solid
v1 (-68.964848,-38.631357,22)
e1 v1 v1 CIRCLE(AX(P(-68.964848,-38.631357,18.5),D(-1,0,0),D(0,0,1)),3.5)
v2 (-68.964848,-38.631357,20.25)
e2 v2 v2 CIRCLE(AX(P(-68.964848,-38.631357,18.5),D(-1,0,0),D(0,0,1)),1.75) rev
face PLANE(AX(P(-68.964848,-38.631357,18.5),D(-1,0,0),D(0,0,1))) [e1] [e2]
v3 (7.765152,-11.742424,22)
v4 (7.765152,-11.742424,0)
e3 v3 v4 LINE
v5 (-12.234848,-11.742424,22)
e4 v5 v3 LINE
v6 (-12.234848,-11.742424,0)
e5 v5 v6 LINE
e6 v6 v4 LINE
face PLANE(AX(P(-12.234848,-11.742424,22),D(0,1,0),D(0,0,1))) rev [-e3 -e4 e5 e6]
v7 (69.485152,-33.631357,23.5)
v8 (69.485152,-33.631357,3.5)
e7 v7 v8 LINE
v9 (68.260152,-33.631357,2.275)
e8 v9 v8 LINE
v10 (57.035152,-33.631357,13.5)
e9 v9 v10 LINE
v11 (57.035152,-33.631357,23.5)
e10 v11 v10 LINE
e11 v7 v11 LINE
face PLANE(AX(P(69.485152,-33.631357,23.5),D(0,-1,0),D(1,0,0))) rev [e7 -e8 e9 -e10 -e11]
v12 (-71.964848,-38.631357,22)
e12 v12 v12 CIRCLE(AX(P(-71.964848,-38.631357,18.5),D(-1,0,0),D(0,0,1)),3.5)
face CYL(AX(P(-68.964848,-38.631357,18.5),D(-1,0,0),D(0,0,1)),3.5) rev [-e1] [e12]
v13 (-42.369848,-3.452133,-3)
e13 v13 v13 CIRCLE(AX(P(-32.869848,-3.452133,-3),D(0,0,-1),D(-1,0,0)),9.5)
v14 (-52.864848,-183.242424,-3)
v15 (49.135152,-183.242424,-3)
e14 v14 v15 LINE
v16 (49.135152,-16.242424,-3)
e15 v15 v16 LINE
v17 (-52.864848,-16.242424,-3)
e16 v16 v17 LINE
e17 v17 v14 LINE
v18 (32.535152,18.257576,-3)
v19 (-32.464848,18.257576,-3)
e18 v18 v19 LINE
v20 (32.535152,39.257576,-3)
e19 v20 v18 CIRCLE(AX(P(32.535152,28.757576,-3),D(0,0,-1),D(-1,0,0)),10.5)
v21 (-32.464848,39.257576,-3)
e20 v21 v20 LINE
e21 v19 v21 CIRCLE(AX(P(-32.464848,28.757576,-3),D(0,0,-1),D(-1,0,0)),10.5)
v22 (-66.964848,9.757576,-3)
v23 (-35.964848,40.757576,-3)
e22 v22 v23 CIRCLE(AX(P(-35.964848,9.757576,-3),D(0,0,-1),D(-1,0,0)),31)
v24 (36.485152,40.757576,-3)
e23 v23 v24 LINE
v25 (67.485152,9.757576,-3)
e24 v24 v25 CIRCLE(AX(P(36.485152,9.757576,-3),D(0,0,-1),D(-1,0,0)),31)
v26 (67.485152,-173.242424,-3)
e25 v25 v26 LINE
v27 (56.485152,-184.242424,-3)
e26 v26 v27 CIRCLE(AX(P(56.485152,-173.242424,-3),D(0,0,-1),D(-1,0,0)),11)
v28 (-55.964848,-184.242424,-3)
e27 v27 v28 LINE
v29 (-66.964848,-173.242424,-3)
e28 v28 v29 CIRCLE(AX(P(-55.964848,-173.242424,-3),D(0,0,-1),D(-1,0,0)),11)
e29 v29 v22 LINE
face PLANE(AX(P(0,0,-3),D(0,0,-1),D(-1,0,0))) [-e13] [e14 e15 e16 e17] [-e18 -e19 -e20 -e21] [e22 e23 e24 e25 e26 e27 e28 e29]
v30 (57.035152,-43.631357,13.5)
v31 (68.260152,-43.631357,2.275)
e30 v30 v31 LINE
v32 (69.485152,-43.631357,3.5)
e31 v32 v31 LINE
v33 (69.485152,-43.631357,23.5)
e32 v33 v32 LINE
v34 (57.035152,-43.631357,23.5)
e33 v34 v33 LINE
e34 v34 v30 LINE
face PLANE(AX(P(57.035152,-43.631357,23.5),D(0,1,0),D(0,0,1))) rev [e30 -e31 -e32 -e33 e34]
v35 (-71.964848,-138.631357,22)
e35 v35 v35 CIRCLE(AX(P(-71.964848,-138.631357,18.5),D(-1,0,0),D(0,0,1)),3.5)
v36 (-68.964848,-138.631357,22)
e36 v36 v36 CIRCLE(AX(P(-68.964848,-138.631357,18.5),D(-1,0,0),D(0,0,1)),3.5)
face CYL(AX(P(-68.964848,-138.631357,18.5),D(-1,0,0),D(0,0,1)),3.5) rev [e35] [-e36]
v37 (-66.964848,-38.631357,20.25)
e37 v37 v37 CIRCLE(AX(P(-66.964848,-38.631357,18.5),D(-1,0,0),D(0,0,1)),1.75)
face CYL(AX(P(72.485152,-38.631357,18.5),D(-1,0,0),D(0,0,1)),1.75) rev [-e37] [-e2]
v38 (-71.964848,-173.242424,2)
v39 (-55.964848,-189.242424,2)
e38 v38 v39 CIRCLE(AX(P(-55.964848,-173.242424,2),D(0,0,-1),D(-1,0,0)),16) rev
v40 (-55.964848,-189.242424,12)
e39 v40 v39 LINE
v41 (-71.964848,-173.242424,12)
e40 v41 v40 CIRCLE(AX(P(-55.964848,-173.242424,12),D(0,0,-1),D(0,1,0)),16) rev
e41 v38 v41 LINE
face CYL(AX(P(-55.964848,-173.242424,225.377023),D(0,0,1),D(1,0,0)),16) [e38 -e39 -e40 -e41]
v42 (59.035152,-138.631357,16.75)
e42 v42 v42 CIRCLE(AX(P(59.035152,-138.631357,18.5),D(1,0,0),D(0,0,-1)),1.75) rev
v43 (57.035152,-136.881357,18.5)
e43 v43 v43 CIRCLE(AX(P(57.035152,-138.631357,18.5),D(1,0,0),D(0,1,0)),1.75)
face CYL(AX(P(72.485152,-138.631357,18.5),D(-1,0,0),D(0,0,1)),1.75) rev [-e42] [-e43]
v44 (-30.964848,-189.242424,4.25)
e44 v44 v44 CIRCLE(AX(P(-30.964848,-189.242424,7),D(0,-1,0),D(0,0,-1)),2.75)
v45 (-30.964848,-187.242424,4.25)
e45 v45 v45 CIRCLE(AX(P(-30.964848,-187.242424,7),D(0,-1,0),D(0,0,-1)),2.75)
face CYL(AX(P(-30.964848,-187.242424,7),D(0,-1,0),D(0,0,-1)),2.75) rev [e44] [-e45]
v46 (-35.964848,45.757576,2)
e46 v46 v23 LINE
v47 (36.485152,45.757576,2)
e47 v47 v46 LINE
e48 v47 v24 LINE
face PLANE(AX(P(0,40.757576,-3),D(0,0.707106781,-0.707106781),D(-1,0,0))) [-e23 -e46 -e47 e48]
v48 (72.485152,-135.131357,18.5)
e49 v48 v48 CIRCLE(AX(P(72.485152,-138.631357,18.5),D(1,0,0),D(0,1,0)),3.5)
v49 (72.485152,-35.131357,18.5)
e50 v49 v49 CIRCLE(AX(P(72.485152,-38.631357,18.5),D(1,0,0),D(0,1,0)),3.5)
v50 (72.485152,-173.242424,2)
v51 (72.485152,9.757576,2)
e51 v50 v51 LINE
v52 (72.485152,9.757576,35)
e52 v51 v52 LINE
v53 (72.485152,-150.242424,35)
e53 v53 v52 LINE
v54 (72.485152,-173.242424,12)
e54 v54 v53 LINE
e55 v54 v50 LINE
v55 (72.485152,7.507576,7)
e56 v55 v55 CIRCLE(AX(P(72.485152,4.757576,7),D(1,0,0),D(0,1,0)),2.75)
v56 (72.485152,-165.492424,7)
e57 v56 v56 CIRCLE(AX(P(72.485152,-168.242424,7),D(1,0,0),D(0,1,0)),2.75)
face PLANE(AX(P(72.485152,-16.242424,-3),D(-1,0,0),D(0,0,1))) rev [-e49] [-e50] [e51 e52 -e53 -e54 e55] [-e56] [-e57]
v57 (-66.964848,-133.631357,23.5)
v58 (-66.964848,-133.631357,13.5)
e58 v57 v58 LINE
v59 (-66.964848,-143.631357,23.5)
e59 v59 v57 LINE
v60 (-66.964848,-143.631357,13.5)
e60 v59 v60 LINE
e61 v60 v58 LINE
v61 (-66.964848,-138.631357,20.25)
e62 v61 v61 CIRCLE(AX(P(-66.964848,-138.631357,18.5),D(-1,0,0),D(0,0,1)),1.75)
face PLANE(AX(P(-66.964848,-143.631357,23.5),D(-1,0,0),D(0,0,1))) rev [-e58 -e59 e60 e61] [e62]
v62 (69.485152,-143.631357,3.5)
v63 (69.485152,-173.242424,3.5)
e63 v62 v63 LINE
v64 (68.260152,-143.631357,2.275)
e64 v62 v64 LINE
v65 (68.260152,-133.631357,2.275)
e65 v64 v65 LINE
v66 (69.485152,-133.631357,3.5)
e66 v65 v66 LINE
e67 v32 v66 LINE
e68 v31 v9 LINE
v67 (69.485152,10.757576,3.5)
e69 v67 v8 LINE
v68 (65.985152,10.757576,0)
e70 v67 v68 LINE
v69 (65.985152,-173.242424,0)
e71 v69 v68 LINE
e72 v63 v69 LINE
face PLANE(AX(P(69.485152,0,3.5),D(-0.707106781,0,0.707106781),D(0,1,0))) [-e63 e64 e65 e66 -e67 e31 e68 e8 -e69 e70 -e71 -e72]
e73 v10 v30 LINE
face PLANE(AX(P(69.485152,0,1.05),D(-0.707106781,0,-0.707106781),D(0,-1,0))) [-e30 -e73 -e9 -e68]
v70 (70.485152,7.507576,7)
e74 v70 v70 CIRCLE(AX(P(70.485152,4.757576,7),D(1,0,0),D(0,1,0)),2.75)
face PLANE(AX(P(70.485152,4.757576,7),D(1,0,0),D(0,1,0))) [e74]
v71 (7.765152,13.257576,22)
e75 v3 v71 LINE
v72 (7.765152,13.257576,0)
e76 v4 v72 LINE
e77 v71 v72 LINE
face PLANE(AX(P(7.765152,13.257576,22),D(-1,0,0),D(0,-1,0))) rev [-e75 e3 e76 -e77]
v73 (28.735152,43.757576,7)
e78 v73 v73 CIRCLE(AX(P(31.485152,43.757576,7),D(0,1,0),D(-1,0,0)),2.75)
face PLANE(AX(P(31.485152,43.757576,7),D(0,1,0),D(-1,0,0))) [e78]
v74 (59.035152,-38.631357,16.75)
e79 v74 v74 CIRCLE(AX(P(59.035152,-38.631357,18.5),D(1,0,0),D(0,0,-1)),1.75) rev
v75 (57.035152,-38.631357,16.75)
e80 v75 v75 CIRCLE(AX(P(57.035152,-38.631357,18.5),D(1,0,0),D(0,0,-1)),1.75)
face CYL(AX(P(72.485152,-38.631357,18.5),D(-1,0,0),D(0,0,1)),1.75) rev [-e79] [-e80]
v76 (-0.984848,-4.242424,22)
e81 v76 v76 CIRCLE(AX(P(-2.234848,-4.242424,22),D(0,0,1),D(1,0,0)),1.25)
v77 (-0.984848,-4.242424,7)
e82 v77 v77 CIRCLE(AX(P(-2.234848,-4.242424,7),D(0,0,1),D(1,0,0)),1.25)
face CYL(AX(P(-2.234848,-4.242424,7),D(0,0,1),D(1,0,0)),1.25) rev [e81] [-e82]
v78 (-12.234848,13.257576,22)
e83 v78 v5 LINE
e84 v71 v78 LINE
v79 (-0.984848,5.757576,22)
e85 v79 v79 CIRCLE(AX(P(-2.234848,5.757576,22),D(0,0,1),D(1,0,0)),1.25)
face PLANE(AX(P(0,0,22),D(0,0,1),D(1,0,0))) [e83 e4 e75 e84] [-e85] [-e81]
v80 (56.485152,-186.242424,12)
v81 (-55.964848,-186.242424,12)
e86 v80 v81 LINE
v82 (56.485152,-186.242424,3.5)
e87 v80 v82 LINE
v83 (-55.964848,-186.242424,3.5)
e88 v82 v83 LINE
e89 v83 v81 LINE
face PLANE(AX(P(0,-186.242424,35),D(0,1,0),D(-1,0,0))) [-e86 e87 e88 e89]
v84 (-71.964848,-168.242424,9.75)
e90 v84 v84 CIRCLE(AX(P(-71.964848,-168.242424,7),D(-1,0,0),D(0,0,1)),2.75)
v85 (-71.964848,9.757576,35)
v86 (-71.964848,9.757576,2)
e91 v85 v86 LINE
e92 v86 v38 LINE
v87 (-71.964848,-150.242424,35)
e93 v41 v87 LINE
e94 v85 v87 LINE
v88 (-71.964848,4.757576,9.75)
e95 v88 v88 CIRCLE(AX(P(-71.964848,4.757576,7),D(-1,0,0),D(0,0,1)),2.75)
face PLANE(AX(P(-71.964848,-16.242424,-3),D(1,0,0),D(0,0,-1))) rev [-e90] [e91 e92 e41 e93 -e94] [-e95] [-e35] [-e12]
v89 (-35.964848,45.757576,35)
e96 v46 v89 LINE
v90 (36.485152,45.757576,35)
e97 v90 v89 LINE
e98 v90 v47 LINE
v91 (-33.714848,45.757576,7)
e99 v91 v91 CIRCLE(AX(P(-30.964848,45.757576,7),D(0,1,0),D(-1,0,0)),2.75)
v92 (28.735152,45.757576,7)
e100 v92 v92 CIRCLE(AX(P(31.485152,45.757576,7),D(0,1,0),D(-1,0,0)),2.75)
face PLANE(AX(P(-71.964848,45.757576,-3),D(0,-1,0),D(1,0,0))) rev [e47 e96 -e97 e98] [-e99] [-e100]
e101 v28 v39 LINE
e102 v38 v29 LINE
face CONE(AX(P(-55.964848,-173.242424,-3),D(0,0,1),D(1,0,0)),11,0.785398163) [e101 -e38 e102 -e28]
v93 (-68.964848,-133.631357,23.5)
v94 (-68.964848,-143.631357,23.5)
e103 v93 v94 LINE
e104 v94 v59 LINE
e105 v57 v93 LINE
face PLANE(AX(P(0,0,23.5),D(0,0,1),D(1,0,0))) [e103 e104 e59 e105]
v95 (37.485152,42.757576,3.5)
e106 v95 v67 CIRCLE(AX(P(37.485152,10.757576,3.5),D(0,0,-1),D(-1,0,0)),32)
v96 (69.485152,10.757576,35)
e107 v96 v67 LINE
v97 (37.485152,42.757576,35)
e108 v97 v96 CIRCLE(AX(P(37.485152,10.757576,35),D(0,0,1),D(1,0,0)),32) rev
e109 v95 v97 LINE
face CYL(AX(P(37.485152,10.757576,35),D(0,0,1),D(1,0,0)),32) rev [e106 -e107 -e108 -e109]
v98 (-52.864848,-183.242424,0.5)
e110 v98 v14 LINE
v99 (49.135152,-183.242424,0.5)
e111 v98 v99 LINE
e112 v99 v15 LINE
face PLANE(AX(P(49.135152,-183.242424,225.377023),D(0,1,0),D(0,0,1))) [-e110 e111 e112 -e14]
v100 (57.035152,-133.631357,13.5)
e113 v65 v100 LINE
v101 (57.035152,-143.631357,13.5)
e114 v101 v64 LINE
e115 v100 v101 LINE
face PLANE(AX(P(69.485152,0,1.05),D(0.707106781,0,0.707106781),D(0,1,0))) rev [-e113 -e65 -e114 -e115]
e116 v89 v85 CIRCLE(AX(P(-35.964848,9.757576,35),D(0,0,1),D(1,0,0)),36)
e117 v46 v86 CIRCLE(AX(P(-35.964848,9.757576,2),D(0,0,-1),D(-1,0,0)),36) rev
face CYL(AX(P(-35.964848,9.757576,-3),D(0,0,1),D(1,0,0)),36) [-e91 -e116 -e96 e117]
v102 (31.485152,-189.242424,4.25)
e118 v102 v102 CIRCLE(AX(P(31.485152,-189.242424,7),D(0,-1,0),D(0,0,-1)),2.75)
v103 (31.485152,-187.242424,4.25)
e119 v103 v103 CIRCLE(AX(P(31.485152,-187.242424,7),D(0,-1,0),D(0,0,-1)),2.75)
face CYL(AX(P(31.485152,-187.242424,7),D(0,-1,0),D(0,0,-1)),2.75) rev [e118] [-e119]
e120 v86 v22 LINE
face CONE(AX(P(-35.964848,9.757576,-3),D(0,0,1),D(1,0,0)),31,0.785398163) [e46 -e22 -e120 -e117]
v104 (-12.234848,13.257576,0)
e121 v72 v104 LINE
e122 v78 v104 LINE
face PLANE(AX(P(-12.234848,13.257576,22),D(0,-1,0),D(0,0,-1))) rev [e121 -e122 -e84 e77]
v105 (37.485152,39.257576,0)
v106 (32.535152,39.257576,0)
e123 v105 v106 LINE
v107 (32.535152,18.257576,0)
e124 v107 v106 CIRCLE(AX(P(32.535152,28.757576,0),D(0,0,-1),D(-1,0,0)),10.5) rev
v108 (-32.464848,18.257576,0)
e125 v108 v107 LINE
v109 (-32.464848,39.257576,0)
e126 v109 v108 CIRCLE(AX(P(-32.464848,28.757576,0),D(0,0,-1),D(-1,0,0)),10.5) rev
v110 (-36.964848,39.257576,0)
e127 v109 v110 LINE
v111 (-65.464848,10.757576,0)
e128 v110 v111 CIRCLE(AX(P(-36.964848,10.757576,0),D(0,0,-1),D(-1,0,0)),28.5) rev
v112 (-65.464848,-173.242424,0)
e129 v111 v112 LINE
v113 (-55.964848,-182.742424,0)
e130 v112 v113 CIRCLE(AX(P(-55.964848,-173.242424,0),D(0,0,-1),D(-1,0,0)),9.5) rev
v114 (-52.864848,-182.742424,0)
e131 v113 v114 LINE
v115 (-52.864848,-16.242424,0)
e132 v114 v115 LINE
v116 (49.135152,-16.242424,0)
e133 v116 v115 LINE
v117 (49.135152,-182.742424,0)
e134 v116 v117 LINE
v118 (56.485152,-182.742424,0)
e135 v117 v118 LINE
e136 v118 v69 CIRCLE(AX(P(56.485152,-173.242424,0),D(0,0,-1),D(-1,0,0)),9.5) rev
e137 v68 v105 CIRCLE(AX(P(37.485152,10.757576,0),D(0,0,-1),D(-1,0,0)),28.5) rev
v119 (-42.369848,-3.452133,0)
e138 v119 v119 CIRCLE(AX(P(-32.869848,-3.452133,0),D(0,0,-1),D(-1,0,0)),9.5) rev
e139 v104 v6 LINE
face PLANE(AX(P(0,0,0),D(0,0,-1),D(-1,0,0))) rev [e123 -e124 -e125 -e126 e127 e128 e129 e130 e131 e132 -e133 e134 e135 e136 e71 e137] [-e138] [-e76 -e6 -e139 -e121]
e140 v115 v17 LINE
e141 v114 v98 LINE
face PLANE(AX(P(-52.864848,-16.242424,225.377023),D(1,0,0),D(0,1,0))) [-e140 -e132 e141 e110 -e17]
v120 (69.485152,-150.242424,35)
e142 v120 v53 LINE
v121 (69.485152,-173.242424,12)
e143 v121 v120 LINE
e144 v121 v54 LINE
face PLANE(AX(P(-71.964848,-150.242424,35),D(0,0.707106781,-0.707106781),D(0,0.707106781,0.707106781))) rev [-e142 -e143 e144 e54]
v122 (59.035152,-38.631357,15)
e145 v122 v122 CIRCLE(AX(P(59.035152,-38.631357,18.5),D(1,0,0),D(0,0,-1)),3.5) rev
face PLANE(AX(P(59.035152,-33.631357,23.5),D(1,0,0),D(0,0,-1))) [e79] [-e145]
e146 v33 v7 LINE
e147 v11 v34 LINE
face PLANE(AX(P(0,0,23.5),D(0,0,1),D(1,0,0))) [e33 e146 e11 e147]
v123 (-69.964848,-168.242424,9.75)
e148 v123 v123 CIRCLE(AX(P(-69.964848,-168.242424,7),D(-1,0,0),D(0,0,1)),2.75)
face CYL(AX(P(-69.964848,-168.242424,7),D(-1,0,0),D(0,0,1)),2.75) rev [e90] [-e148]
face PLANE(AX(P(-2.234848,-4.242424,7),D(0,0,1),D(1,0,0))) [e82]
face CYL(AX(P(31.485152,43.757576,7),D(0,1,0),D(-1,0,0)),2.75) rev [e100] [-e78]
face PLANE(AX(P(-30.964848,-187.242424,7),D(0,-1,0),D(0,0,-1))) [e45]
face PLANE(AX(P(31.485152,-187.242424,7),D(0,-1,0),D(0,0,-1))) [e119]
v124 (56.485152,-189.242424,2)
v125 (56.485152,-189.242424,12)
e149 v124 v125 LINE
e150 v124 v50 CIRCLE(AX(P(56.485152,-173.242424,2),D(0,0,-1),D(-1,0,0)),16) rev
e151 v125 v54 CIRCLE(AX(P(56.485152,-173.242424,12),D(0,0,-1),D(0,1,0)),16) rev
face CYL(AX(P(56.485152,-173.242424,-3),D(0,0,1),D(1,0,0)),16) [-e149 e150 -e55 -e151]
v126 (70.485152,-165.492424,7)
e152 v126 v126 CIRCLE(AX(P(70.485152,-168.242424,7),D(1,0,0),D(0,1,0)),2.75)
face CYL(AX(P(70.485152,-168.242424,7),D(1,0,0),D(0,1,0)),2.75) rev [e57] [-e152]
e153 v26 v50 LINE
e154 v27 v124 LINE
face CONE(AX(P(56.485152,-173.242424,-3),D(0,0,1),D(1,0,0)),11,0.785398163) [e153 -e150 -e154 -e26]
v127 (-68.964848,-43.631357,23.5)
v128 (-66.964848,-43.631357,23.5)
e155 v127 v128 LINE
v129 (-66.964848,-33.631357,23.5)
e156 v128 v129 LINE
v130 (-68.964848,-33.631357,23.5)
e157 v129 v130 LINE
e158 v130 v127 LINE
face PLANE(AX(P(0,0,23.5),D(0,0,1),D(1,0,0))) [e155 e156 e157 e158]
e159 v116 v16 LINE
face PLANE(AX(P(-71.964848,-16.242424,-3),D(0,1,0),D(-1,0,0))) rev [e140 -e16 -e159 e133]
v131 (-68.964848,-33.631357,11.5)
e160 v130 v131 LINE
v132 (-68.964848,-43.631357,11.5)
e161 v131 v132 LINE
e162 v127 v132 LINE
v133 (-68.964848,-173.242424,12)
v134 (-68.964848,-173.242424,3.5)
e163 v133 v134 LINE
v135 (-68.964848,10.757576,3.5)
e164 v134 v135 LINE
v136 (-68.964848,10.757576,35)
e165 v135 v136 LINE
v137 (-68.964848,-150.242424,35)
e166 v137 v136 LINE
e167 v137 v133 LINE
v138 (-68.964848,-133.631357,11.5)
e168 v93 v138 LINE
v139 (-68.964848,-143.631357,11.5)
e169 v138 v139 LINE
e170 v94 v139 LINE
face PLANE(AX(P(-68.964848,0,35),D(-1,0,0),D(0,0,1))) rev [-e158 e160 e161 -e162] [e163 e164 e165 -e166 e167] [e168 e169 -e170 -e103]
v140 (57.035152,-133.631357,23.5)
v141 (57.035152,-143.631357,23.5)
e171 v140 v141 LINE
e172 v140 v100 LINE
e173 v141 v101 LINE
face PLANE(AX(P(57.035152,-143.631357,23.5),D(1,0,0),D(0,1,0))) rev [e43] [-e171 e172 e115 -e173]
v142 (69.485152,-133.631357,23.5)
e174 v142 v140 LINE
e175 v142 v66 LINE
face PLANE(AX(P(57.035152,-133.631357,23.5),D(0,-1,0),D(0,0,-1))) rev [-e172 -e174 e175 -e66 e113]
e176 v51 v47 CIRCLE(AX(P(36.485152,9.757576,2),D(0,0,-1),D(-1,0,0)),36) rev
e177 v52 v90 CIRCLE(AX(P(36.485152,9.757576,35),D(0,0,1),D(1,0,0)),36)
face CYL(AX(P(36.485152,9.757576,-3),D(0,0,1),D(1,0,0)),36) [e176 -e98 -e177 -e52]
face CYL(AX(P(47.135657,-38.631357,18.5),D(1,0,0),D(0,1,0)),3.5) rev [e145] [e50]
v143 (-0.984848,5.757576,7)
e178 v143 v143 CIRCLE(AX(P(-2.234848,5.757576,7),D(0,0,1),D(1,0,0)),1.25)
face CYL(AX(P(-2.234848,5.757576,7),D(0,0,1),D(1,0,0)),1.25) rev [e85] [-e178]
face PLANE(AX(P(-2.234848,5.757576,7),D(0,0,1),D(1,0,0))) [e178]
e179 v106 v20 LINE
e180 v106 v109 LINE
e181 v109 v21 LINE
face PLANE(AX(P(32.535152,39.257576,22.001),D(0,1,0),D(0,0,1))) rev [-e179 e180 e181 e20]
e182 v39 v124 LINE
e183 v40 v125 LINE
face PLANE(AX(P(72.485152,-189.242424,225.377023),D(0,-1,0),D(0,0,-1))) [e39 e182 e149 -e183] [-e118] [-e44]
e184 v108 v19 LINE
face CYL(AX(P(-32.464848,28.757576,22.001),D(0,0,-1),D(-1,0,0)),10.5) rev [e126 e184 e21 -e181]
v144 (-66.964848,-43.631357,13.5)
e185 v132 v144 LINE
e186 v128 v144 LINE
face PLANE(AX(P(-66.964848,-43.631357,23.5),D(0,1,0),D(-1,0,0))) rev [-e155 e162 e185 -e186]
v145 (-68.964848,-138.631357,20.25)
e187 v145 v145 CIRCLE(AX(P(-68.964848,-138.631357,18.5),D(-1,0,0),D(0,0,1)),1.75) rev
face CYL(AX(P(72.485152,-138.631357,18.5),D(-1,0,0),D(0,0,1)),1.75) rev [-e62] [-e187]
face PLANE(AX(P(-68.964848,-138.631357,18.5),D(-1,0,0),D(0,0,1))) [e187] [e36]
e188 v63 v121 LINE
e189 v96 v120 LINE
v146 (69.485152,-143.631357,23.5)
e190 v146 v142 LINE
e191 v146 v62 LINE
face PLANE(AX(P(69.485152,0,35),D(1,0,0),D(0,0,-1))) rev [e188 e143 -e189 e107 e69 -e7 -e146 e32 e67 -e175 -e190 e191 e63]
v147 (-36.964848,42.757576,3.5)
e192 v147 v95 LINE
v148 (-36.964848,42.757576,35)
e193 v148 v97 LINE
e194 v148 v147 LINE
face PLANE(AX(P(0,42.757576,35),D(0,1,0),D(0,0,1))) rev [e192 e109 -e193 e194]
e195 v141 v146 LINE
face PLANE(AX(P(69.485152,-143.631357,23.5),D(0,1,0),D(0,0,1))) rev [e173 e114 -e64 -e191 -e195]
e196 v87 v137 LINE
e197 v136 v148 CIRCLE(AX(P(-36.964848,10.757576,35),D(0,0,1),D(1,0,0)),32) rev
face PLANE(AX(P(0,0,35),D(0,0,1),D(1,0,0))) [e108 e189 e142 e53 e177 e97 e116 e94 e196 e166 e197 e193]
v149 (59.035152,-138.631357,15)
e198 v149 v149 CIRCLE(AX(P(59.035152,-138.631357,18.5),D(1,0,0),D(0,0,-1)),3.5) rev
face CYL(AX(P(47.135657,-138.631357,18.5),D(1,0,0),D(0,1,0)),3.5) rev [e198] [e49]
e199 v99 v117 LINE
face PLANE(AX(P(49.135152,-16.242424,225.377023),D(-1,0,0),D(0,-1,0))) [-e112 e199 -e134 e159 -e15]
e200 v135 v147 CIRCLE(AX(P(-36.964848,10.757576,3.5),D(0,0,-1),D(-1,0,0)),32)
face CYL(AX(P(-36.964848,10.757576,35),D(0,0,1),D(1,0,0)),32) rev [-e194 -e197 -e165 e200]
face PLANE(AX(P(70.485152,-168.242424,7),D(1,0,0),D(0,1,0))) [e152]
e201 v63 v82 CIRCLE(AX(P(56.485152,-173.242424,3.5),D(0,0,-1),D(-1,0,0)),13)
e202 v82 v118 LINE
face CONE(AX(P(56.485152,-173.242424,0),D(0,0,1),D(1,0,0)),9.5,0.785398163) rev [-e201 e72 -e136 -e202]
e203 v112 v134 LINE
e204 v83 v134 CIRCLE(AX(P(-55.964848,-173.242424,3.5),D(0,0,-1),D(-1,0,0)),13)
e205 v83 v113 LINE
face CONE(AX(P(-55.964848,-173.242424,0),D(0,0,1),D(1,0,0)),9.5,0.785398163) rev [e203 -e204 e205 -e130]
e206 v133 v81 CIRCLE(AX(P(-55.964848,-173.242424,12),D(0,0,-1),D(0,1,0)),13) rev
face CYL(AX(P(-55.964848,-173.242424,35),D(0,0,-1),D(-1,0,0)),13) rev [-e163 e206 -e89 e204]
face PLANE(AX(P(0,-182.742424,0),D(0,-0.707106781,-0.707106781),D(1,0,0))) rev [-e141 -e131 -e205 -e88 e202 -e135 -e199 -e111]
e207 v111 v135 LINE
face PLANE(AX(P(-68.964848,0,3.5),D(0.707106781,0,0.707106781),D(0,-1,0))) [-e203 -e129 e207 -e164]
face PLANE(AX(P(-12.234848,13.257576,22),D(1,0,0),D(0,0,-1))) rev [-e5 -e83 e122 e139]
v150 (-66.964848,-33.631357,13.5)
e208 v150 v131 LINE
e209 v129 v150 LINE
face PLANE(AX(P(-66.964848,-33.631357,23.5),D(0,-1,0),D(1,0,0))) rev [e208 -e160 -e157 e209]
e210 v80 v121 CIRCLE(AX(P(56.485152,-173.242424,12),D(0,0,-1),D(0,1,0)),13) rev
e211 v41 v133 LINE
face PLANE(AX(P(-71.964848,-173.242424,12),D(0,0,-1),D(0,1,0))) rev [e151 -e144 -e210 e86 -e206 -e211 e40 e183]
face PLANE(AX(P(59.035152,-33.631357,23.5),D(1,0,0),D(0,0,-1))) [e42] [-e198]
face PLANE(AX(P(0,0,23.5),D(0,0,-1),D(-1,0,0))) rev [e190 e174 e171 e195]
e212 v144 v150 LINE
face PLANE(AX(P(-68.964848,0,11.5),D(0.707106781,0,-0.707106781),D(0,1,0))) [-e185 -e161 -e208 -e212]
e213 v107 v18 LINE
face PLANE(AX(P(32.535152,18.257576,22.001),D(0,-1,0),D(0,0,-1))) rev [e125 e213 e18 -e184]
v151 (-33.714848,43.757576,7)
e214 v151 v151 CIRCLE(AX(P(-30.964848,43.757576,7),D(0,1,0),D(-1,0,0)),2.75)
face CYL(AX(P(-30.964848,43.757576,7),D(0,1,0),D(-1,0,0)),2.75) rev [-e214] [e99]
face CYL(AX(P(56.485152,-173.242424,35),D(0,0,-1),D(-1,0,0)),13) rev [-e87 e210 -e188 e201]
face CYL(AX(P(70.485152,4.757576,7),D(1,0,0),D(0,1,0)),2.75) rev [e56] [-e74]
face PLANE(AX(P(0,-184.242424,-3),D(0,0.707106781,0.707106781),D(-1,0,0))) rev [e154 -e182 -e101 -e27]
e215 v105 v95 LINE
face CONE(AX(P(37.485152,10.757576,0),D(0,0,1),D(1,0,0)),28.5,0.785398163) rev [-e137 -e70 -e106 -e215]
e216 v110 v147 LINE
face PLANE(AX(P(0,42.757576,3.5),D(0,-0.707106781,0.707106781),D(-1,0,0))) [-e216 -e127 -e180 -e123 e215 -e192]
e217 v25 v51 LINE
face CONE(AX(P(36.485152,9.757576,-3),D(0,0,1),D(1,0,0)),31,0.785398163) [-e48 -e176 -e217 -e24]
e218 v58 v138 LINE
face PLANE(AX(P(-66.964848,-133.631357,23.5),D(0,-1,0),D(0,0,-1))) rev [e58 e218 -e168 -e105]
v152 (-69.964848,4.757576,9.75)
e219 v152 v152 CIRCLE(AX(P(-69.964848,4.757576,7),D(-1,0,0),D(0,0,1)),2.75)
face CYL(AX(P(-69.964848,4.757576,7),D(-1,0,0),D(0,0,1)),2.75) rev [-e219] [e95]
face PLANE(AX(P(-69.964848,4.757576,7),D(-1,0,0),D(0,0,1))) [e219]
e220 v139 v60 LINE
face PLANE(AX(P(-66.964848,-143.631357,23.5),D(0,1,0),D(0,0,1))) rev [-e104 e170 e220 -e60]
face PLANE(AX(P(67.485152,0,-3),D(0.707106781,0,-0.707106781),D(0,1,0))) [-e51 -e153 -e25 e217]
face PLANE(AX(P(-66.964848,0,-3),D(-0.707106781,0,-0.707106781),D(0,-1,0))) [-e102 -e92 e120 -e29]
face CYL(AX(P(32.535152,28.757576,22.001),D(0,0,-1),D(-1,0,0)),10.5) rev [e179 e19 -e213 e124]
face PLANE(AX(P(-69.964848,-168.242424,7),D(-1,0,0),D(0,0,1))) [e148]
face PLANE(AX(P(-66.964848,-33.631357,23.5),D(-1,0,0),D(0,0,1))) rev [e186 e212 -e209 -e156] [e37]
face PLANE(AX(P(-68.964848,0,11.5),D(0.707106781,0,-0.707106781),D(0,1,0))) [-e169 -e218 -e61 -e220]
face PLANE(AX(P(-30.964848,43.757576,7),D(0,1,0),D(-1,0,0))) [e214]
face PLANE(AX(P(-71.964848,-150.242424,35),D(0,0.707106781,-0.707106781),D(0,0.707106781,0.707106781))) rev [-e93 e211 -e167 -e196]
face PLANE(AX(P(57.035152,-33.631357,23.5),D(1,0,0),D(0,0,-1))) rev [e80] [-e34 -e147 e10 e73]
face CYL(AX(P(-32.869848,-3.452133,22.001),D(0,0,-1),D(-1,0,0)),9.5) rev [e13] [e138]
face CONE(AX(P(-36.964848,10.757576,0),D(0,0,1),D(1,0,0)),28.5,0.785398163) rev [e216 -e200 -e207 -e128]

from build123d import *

# Parameters (mm, degrees)
ESQUISSE1_W                  = 20
ESQUISSE1_H                  = 25
BOSS_EXTRU_1_DEPTH           = 22
ESQUISSE2_R                  = 1.25
ENL_V_MAT_EXTRU_1_DEPTH      = 15
ESQUISSE3_W                  = 144.45
ESQUISSE3_H                  = 62
WALL_DEPTH                   = 3
CAMERAS_REACH                = 91.291
ESQUISSE4_R                  = 9.5
SCREEN_DEPTH                 = 3
ESQUISSE5_W                  = 144.45
ESQUISSE5_H                  = 235
ESQUISSE5_W_2                = 138.45
ESQUISSE5_H_2                = 229
BOSS_EXTRU_3_DEPTH           = 35
CONG_1_R                     = 32
CONG_2_R                     = 36
CONG_3_R                     = 13
CONG_4_R                     = 16
CHANFREIN1_SIZE              = 5
CHANFREIN2_SIZE              = 3.5
ENL_V_MAT_EXTRU_9_DEPTH      = 241.631456034
ESQUISSE11_W                 = 12.45
ESQUISSE11_H                 = 10
ESQUISSE11_W_2               = 2
BOSS_EXTRU_5_DEPTH           = 10
CHANFREIN3_SIZE              = 2
CHANFREIN4_SIZE              = 12.45
ENL_V_MAT_EXTRU_5_DEPTH      = 232.686631322
ENL_V_MAT_EXTRU_5_DEPTH_BACK = 232.686631322
ESQUISSE12_R                 = 1.75
ESQUISSE13_R                 = 3.5
ENL_V_MAT_EXTRU_6_DEPTH      = 3
ENL_V_START                  = -13.45
ESQUISSE14_R                 = 3.5
ENL_V_MAT_EXTRU_7_DEPTH      = 13.45
ESQUISSE6_R                  = 2.75
ENL_V_MAT_EXTRU_2_DEPTH      = 2
ESQUISSE7_R                  = 2.75
ENL_V_MAT_EXTRU_3_DEPTH      = 2
ENL_V_START_2                = -2
ESQUISSE8_R                  = 2.75
ENL_V_MAT_EXTRU_4_DEPTH      = 2
ESQUISSE15_R                 = 2.75
ENL_V_MAT_EXTRU_8_DEPTH      = 2


# Some blends are built 0.0001 mm under size
with BuildPart() as part:
    # Esquisse1 → Boss.-Extru.1 (new body)
    with BuildSketch(Plane.XY):
        with Locations((-2.234848485, 0.757575758)):
            Rectangle(ESQUISSE1_W, ESQUISSE1_H)
    extrude(amount=BOSS_EXTRU_1_DEPTH)

    # Esquisse2 → Enlèv. mat.-Extru.1 (cut)
    with BuildSketch(Plane.XY.offset(22)):
        with Locations((-2.234848485, 5.757575758)):
            Circle(ESQUISSE2_R)
        with Locations((-2.234848485, -4.242424242)):
            Circle(ESQUISSE2_R)
    extrude(amount=-ENL_V_MAT_EXTRU_1_DEPTH, mode=Mode.SUBTRACT)

    # Esquisse3 → Wall (add)
    with BuildSketch(Plane(origin=(0, 0, 0), x_dir=(-1, 0, 0), z_dir=(0, 0, -1))):
        with Locations((-0.260151515, 14.757575758)):
            Rectangle(ESQUISSE3_W, ESQUISSE3_H)
    extrude(amount=WALL_DEPTH)

    # Esquisse4 → Cameras (cut, up to next)
    with BuildSketch(Plane(origin=(0, 0, -3), x_dir=(-1, 0, 0), z_dir=(0, 0, -1)), mode=Mode.PRIVATE) as cameras_sk1:
        with Locations((32.869848485, -3.452132942)):
            Circle(ESQUISSE4_R)
    cameras_tool1 = extrude(cameras_sk1.sketch, amount=-CAMERAS_REACH, mode=Mode.PRIVATE) & part.part
    # Esquisse4 → Cameras (cut, up to next)
    with BuildSketch(Plane(origin=(0, 0, -3), x_dir=(-1, 0, 0), z_dir=(0, 0, -1)), mode=Mode.PRIVATE) as cameras_sk2:
        with BuildLine():
            Line((-32.535151515, 39.257575758), (32.464848485, 39.257575758))
            ThreePointArc((32.464848485, 39.257575758), (42.964848485, 28.757575758), (32.464848485, 18.257575758))
            Line((32.464848485, 18.257575758), (-32.535151515, 18.257575758))
            ThreePointArc((-32.535151515, 18.257575758), (-43.035151515, 28.757575758), (-32.535151515, 39.257575758))
        make_face()
    cameras_tool2 = extrude(cameras_sk2.sketch, amount=-CAMERAS_REACH, mode=Mode.PRIVATE) & part.part
    add(cameras_tool1.solids().sort_by_distance((-32.869848, -3.452133, -3))[0], mode=Mode.SUBTRACT)
    add(cameras_tool2.solids().sort_by_distance((0.035152, 28.757576, -3))[0], mode=Mode.SUBTRACT)

    # Esquisse9 → Screen (add)
    with BuildSketch(Plane(origin=(0, 0, -3), x_dir=(-1, 0, 0), z_dir=(0, 0, -1))):
        Polygon((-49.135151515, -183.242424242), (52.864848485, -183.242424242), (52.864848485, -16.242424242), (71.964848485, -16.242424242), (71.964848485, -189.242424242), (-72.485151515, -189.242424242), (-72.485151515, -16.242424242), (-49.135151515, -16.242424242), align=None)
    extrude(amount=-SCREEN_DEPTH)

    # Esquisse5 → Boss.-Extru.3 (add)
    with BuildSketch(Plane.XY):
        with Locations((0.260151515, -71.742424242)):
            Rectangle(ESQUISSE5_W, ESQUISSE5_H)
        with Locations((0.260151515, -71.742424242)):
            Rectangle(ESQUISSE5_W_2, ESQUISSE5_H_2, mode=Mode.SUBTRACT)
    extrude(amount=BOSS_EXTRU_3_DEPTH)

    # Congé1
    cong_1_edges = [part.edges().sort_by_distance(p)[0] for p in [
        (-68.964848485, 42.757575758, 17.5),
        (69.485151515, 42.757575758, 17.5),
    ]]
    fillet(cong_1_edges, radius=CONG_1_R)

    # Congé2
    cong_2_edges = [part.edges().sort_by_distance(p)[0] for p in [
        (-71.964848485, 45.757575758, 16),
        (72.485151515, 45.757575758, 16),
    ]]
    fillet(cong_2_edges, radius=CONG_2_R)

    # Congé3
    cong_3_edges = [part.edges().sort_by_distance(p)[0] for p in [
        (69.485151515, -186.242424242, 17.5),
        (-68.964848485, -186.242424242, 17.5),
    ]]
    fillet(cong_3_edges, radius=CONG_3_R)

    # Congé4
    cong_4_edges = [part.edges().sort_by_distance(p)[0] for p in [
        (72.485151515, -189.242424242, 16),
        (-71.964848485, -189.242424242, 16),
    ]]
    fillet(cong_4_edges, radius=CONG_4_R)

    # Chanfrein1
    chanfrein1_edges = [part.edges().sort_by_distance(p)[0] for p in [
        (0.260151515, 45.757575758, -3),
        (72.485151515, -81.742424242, -3),
        (61.940995638, 35.21341988, -3),
        (-61.420692608, 35.21341988, -3),
        (0.260151515, -189.242424242, -3),
        (-71.964848485, -81.742424242, -3),
        (67.798860014, -184.556132741, -3),
        (-67.278556984, -184.556132741, -3),
    ]]
    chamfer(chanfrein1_edges, length=CHANFREIN1_SIZE)

    # Chanfrein2
    # the kernel refuses this chamfer: 3.5 mm, written as the material it adds along each edge
    with BuildSketch(Plane(origin=(-68.964848485, 10.757575758, 0), x_dir=(-0.02749587661058612, 0, 0.9996219169112968), z_dir=(0, -1, 0)), Plane(origin=(69.485151515, -173.242424242, 0), x_dir=(0.02749587661058612, 0, 0.9996219169112968), z_dir=(0, 1, 0))) as chanfrein2_piece_1:
        Polygon((CHANFREIN2_SIZE * 0.999621916911, -CHANFREIN2_SIZE * 0.0274958766106), (-CHANFREIN2_SIZE * 0.0274958766106, -CHANFREIN2_SIZE * 0.999621916911), (0, 0), align=None)
    extrude(amount=184)
    with BuildSketch(Plane(origin=(-36.964848485, 10.757575758, 0), x_dir=(0, 1, 0), z_dir=(1, 0, 0))) as chanfrein2_piece_2:
        Polygon((32, CHANFREIN2_SIZE), (32 - CHANFREIN2_SIZE, 0), (32, 0), align=None)
    revolve(axis=Axis((-36.964848485, 10.757575758, 0), (0, 0, 1)), revolution_arc=90)
    with BuildSketch(Plane(origin=(37.485151515, 42.757575758, 0), x_dir=(0, 0.02749587661058612, 0.9996219169112968), z_dir=(-1, 0, 0))) as chanfrein2_piece_3:
        Polygon((CHANFREIN2_SIZE * 0.999621916911, -CHANFREIN2_SIZE * 0.0274958766106), (-CHANFREIN2_SIZE * 0.0274958766106, -CHANFREIN2_SIZE * 0.999621916911), (0, 0), align=None)
    extrude(amount=74.45)
    with BuildSketch(Plane(origin=(37.485151515, 10.757575758, 0), x_dir=(1, 0, 0), z_dir=(0, -1, 0))) as chanfrein2_piece_4:
        Polygon((32, CHANFREIN2_SIZE), (32 - CHANFREIN2_SIZE, 0), (32, 0), align=None)
    revolve(axis=Axis((37.485151515, 10.757575758, 0), (0, 0, 1)), revolution_arc=90)
    with BuildSketch(Plane(origin=(-55.964848485, -173.242424242, 0), x_dir=(-1, 0, 0), z_dir=(0, 1, 0))) as chanfrein2_piece_5:
        Polygon((13, CHANFREIN2_SIZE), (13 - CHANFREIN2_SIZE, 0), (13, 0), align=None)
    revolve(axis=Axis((-55.964848485, -173.242424242, 0), (0, 0, 1)), revolution_arc=90)
    with BuildSketch(Plane(origin=(-55.964848485, -186.242424242, 0), x_dir=(0, -0.027495876610590064, 0.9996219169112966), z_dir=(1, 0, 0))) as chanfrein2_piece_6_section:
        Polygon((CHANFREIN2_SIZE * 0.999621916911, -CHANFREIN2_SIZE * 0.0274958766106), (-CHANFREIN2_SIZE * 0.0274958766106, -CHANFREIN2_SIZE * 0.999621916911), (0, 0), align=None)
    chanfrein2_piece_6 = extrude(amount=112.45, mode=Mode.PRIVATE)
    chanfrein2_piece_6 = split(chanfrein2_piece_6, bisect_by=Plane(origin=(-53.646167158, -183.242424242, 1.694983129), z_dir=(0, -1, 0)), keep=Keep.TOP, mode=Mode.PRIVATE)
    add(chanfrein2_piece_6)
    with BuildSketch(Plane(origin=(-55.964848485, -186.242424242, 0), x_dir=(0, -0.027495876610590064, 0.9996219169112966), z_dir=(1, 0, 0))) as chanfrein2_piece_7_section:
        Polygon((CHANFREIN2_SIZE * 0.999621916911, -CHANFREIN2_SIZE * 0.0274958766106), (-CHANFREIN2_SIZE * 0.0274958766106, -CHANFREIN2_SIZE * 0.999621916911), (0, 0), align=None)
    chanfrein2_piece_7 = extrude(amount=112.45, mode=Mode.PRIVATE)
    chanfrein2_piece_7 = split(chanfrein2_piece_7, bisect_by=Plane(origin=(-52.864848485, -183.075757576, 0.166666667), z_dir=(-1, 0, 0)), keep=Keep.TOP, mode=Mode.PRIVATE)
    add(chanfrein2_piece_7)
    with BuildSketch(Plane(origin=(-55.964848485, -186.242424242, 0), x_dir=(0, -0.027495876610590064, 0.9996219169112966), z_dir=(1, 0, 0))) as chanfrein2_piece_8_section:
        Polygon((CHANFREIN2_SIZE * 0.999621916911, -CHANFREIN2_SIZE * 0.0274958766106), (-CHANFREIN2_SIZE * 0.0274958766106, -CHANFREIN2_SIZE * 0.999621916911), (0, 0), align=None)
    chanfrein2_piece_8 = extrude(amount=112.45, mode=Mode.PRIVATE)
    chanfrein2_piece_8 = split(chanfrein2_piece_8, bisect_by=Plane(origin=(49.135151515, -183.075757576, 0.166666667), z_dir=(1, 0, 0)), keep=Keep.TOP, mode=Mode.PRIVATE)
    add(chanfrein2_piece_8)
    with BuildSketch(Plane(origin=(56.485151515, -173.242424242, 0), x_dir=(0, -1, 0), z_dir=(-1, 0, 0))) as chanfrein2_piece_9:
        Polygon((13, CHANFREIN2_SIZE), (13 - CHANFREIN2_SIZE, 0), (13, 0), align=None)
    revolve(axis=Axis((56.485151515, -173.242424242, 0), (0, 0, 1)), revolution_arc=90)

    # Esquisse16 → Enlèv. mat.-Extru.9 (cut, through all)
    with BuildSketch(Plane(origin=(72.485151515, 0, 0), x_dir=(0, 0, -1), z_dir=(1, 0, 0))):
        Polygon((-35, -150.242424242), (-12, -173.242424242), (-12, -189.242424242), (-35, -189.242424242), align=None)
    extrude(amount=-ENL_V_MAT_EXTRU_9_DEPTH, mode=Mode.SUBTRACT)

    # Esquisse11 → Boss.-Extru.5 (add)
    with BuildSketch(Plane.XY.offset(13.5)):
        with Locations((63.260151515, -138.631356632)):
            Rectangle(ESQUISSE11_W, ESQUISSE11_H)
        with Locations((63.260151515, -38.631356632)):
            Rectangle(ESQUISSE11_W, ESQUISSE11_H)
        with Locations((-67.964848485, -138.631356632)):
            Rectangle(ESQUISSE11_W_2, ESQUISSE11_H)
        with Locations((-67.964848485, -38.631356632)):
            Rectangle(ESQUISSE11_W_2, ESQUISSE11_H)
    extrude(amount=BOSS_EXTRU_5_DEPTH)

    # Chanfrein3
    chanfrein3_edges = [part.edges().sort_by_distance(p)[0] for p in [
        (-68.964848485, -38.631356632, 13.5),
        (-68.964848485, -138.631356632, 13.5),
    ]]
    chamfer(chanfrein3_edges, length=CHANFREIN3_SIZE - 0.0001)  # a hair under: the kernel refuses the full size

    # Chanfrein4
    # the kernel refuses this chamfer: 12.45 mm, written as the material it adds along each edge
    with BuildSketch(Plane(origin=(69.485151515, -43.631356632, 13.5), x_dir=(0.027495876610586834, 0, -0.9996219169112968), z_dir=(0, 1, 0))) as chanfrein4_piece_1_section:
        Polygon((CHANFREIN4_SIZE * 0.999621916911, CHANFREIN4_SIZE * 0.0274958766106), (-CHANFREIN4_SIZE * 0.0274958766106, CHANFREIN4_SIZE * 0.999621916911), (0, 0), align=None)
    chanfrein4_piece_1 = extrude(amount=10, mode=Mode.PRIVATE)
    chanfrein4_piece_1 = split(chanfrein4_piece_1, bisect_by=Plane(origin=(57.035151515, -38.631356632, 9.386468279), z_dir=(1, 0, 0)), keep=Keep.TOP, mode=Mode.PRIVATE)
    add(chanfrein4_piece_1)
    with BuildSketch(Plane(origin=(69.485151515, -133.631356632, 13.5), x_dir=(0.027495876610586834, 0, -0.9996219169112968), z_dir=(0, -1, 0))) as chanfrein4_piece_2_section:
        Polygon((CHANFREIN4_SIZE * 0.999621916911, -CHANFREIN4_SIZE * 0.0274958766106), (-CHANFREIN4_SIZE * 0.0274958766106, -CHANFREIN4_SIZE * 0.999621916911), (0, 0), align=None)
    chanfrein4_piece_2 = extrude(amount=10, mode=Mode.PRIVATE)
    chanfrein4_piece_2 = split(chanfrein4_piece_2, bisect_by=Plane(origin=(57.035151515, -138.631356632, 9.386468279), z_dir=(1, 0, 0)), keep=Keep.TOP, mode=Mode.PRIVATE)
    add(chanfrein4_piece_2)

    # Esquisse12 → Enlèv. mat.-Extru.5 (cut, two sides: drawn at the far end of the back side and taken through both)
    with BuildSketch(Plane.ZY.offset(-57.035151515).offset(-ENL_V_MAT_EXTRU_5_DEPTH_BACK)):
        with Locations((18.5, -38.631356632)):
            Circle(ESQUISSE12_R)
        with Locations((18.5, -138.631356632)):
            Circle(ESQUISSE12_R)
    extrude(amount=ENL_V_MAT_EXTRU_5_DEPTH + ENL_V_MAT_EXTRU_5_DEPTH_BACK, mode=Mode.SUBTRACT)

    # Esquisse13 → Enlèv. mat.-Extru.6 (cut)
    with BuildSketch(Plane.ZY.offset(71.964848485)):
        with Locations((18.5, -38.631356632)):
            Circle(ESQUISSE13_R)
        with Locations((18.5, -138.631356632)):
            Circle(ESQUISSE13_R)
    extrude(amount=-ENL_V_MAT_EXTRU_6_DEPTH, mode=Mode.SUBTRACT)

    # Esquisse14 → Enlèv. mat.-Extru.7 (cut)
    with BuildSketch(Plane(origin=(72.485151515, 0, 0), x_dir=(0, 0, -1), z_dir=(1, 0, 0)).offset(ENL_V_START)):
        with Locations(Location((-18.5, -138.631356632, 0), (0, 0, 180))):
            Circle(ESQUISSE14_R)
        with Locations(Location((-18.5, -38.631356632, 0), (0, 0, 180))):
            Circle(ESQUISSE14_R)
    extrude(amount=ENL_V_MAT_EXTRU_7_DEPTH, mode=Mode.SUBTRACT)

    # Esquisse6 → Enlèv. mat.-Extru.2 (cut)
    with BuildSketch(Plane(origin=(0, 45.757575758, 0), x_dir=(1, 0, 0), z_dir=(0, 1, 0))):
        with Locations(Location((31.485151515, -7, 0), (0, 0, 180))):
            Circle(ESQUISSE6_R)
        with Locations(Location((-30.964848485, -7, 0), (0, 0, 180))):
            Circle(ESQUISSE6_R)
    extrude(amount=-ENL_V_MAT_EXTRU_2_DEPTH, mode=Mode.SUBTRACT)

    # Esquisse7 → Enlèv. mat.-Extru.3 (cut)
    with BuildSketch(Plane(origin=(72.485151515, 0, 0), x_dir=(0, 0, -1), z_dir=(1, 0, 0))):
        with Locations(Location((-7, 4.757575758, 0), (0, 0, 90))):
            Circle(ESQUISSE7_R)
        with Locations(Location((-7, -168.242424242, 0), (0, 0, 90))):
            Circle(ESQUISSE7_R)
    extrude(amount=-ENL_V_MAT_EXTRU_3_DEPTH, mode=Mode.SUBTRACT)

    # Esquisse8 → Enlèv. mat.-Extru.4 (cut)
    with BuildSketch(Plane.ZY.offset(71.964848485).offset(ENL_V_START_2)):
        with Locations(Location((7, 4.757575758, 0), (0, 0, 90))):
            Circle(ESQUISSE8_R)
        with Locations(Location((7, -168.242424242, 0), (0, 0, 90))):
            Circle(ESQUISSE8_R)
    extrude(amount=ENL_V_MAT_EXTRU_4_DEPTH, mode=Mode.SUBTRACT)

    # Esquisse15 → Enlèv. mat.-Extru.8 (cut)
    with BuildSketch(Plane.XZ.offset(189.242424242).offset(ENL_V_START_2)):
        with Locations(Location((-30.964848485, 7, 0), (0, 0, 180))):
            Circle(ESQUISSE15_R)
        with Locations(Location((31.485151515, 7, 0), (0, 0, 180))):
            Circle(ESQUISSE15_R)
    extrude(amount=ENL_V_MAT_EXTRU_8_DEPTH, mode=Mode.SUBTRACT)


solid = part.part
